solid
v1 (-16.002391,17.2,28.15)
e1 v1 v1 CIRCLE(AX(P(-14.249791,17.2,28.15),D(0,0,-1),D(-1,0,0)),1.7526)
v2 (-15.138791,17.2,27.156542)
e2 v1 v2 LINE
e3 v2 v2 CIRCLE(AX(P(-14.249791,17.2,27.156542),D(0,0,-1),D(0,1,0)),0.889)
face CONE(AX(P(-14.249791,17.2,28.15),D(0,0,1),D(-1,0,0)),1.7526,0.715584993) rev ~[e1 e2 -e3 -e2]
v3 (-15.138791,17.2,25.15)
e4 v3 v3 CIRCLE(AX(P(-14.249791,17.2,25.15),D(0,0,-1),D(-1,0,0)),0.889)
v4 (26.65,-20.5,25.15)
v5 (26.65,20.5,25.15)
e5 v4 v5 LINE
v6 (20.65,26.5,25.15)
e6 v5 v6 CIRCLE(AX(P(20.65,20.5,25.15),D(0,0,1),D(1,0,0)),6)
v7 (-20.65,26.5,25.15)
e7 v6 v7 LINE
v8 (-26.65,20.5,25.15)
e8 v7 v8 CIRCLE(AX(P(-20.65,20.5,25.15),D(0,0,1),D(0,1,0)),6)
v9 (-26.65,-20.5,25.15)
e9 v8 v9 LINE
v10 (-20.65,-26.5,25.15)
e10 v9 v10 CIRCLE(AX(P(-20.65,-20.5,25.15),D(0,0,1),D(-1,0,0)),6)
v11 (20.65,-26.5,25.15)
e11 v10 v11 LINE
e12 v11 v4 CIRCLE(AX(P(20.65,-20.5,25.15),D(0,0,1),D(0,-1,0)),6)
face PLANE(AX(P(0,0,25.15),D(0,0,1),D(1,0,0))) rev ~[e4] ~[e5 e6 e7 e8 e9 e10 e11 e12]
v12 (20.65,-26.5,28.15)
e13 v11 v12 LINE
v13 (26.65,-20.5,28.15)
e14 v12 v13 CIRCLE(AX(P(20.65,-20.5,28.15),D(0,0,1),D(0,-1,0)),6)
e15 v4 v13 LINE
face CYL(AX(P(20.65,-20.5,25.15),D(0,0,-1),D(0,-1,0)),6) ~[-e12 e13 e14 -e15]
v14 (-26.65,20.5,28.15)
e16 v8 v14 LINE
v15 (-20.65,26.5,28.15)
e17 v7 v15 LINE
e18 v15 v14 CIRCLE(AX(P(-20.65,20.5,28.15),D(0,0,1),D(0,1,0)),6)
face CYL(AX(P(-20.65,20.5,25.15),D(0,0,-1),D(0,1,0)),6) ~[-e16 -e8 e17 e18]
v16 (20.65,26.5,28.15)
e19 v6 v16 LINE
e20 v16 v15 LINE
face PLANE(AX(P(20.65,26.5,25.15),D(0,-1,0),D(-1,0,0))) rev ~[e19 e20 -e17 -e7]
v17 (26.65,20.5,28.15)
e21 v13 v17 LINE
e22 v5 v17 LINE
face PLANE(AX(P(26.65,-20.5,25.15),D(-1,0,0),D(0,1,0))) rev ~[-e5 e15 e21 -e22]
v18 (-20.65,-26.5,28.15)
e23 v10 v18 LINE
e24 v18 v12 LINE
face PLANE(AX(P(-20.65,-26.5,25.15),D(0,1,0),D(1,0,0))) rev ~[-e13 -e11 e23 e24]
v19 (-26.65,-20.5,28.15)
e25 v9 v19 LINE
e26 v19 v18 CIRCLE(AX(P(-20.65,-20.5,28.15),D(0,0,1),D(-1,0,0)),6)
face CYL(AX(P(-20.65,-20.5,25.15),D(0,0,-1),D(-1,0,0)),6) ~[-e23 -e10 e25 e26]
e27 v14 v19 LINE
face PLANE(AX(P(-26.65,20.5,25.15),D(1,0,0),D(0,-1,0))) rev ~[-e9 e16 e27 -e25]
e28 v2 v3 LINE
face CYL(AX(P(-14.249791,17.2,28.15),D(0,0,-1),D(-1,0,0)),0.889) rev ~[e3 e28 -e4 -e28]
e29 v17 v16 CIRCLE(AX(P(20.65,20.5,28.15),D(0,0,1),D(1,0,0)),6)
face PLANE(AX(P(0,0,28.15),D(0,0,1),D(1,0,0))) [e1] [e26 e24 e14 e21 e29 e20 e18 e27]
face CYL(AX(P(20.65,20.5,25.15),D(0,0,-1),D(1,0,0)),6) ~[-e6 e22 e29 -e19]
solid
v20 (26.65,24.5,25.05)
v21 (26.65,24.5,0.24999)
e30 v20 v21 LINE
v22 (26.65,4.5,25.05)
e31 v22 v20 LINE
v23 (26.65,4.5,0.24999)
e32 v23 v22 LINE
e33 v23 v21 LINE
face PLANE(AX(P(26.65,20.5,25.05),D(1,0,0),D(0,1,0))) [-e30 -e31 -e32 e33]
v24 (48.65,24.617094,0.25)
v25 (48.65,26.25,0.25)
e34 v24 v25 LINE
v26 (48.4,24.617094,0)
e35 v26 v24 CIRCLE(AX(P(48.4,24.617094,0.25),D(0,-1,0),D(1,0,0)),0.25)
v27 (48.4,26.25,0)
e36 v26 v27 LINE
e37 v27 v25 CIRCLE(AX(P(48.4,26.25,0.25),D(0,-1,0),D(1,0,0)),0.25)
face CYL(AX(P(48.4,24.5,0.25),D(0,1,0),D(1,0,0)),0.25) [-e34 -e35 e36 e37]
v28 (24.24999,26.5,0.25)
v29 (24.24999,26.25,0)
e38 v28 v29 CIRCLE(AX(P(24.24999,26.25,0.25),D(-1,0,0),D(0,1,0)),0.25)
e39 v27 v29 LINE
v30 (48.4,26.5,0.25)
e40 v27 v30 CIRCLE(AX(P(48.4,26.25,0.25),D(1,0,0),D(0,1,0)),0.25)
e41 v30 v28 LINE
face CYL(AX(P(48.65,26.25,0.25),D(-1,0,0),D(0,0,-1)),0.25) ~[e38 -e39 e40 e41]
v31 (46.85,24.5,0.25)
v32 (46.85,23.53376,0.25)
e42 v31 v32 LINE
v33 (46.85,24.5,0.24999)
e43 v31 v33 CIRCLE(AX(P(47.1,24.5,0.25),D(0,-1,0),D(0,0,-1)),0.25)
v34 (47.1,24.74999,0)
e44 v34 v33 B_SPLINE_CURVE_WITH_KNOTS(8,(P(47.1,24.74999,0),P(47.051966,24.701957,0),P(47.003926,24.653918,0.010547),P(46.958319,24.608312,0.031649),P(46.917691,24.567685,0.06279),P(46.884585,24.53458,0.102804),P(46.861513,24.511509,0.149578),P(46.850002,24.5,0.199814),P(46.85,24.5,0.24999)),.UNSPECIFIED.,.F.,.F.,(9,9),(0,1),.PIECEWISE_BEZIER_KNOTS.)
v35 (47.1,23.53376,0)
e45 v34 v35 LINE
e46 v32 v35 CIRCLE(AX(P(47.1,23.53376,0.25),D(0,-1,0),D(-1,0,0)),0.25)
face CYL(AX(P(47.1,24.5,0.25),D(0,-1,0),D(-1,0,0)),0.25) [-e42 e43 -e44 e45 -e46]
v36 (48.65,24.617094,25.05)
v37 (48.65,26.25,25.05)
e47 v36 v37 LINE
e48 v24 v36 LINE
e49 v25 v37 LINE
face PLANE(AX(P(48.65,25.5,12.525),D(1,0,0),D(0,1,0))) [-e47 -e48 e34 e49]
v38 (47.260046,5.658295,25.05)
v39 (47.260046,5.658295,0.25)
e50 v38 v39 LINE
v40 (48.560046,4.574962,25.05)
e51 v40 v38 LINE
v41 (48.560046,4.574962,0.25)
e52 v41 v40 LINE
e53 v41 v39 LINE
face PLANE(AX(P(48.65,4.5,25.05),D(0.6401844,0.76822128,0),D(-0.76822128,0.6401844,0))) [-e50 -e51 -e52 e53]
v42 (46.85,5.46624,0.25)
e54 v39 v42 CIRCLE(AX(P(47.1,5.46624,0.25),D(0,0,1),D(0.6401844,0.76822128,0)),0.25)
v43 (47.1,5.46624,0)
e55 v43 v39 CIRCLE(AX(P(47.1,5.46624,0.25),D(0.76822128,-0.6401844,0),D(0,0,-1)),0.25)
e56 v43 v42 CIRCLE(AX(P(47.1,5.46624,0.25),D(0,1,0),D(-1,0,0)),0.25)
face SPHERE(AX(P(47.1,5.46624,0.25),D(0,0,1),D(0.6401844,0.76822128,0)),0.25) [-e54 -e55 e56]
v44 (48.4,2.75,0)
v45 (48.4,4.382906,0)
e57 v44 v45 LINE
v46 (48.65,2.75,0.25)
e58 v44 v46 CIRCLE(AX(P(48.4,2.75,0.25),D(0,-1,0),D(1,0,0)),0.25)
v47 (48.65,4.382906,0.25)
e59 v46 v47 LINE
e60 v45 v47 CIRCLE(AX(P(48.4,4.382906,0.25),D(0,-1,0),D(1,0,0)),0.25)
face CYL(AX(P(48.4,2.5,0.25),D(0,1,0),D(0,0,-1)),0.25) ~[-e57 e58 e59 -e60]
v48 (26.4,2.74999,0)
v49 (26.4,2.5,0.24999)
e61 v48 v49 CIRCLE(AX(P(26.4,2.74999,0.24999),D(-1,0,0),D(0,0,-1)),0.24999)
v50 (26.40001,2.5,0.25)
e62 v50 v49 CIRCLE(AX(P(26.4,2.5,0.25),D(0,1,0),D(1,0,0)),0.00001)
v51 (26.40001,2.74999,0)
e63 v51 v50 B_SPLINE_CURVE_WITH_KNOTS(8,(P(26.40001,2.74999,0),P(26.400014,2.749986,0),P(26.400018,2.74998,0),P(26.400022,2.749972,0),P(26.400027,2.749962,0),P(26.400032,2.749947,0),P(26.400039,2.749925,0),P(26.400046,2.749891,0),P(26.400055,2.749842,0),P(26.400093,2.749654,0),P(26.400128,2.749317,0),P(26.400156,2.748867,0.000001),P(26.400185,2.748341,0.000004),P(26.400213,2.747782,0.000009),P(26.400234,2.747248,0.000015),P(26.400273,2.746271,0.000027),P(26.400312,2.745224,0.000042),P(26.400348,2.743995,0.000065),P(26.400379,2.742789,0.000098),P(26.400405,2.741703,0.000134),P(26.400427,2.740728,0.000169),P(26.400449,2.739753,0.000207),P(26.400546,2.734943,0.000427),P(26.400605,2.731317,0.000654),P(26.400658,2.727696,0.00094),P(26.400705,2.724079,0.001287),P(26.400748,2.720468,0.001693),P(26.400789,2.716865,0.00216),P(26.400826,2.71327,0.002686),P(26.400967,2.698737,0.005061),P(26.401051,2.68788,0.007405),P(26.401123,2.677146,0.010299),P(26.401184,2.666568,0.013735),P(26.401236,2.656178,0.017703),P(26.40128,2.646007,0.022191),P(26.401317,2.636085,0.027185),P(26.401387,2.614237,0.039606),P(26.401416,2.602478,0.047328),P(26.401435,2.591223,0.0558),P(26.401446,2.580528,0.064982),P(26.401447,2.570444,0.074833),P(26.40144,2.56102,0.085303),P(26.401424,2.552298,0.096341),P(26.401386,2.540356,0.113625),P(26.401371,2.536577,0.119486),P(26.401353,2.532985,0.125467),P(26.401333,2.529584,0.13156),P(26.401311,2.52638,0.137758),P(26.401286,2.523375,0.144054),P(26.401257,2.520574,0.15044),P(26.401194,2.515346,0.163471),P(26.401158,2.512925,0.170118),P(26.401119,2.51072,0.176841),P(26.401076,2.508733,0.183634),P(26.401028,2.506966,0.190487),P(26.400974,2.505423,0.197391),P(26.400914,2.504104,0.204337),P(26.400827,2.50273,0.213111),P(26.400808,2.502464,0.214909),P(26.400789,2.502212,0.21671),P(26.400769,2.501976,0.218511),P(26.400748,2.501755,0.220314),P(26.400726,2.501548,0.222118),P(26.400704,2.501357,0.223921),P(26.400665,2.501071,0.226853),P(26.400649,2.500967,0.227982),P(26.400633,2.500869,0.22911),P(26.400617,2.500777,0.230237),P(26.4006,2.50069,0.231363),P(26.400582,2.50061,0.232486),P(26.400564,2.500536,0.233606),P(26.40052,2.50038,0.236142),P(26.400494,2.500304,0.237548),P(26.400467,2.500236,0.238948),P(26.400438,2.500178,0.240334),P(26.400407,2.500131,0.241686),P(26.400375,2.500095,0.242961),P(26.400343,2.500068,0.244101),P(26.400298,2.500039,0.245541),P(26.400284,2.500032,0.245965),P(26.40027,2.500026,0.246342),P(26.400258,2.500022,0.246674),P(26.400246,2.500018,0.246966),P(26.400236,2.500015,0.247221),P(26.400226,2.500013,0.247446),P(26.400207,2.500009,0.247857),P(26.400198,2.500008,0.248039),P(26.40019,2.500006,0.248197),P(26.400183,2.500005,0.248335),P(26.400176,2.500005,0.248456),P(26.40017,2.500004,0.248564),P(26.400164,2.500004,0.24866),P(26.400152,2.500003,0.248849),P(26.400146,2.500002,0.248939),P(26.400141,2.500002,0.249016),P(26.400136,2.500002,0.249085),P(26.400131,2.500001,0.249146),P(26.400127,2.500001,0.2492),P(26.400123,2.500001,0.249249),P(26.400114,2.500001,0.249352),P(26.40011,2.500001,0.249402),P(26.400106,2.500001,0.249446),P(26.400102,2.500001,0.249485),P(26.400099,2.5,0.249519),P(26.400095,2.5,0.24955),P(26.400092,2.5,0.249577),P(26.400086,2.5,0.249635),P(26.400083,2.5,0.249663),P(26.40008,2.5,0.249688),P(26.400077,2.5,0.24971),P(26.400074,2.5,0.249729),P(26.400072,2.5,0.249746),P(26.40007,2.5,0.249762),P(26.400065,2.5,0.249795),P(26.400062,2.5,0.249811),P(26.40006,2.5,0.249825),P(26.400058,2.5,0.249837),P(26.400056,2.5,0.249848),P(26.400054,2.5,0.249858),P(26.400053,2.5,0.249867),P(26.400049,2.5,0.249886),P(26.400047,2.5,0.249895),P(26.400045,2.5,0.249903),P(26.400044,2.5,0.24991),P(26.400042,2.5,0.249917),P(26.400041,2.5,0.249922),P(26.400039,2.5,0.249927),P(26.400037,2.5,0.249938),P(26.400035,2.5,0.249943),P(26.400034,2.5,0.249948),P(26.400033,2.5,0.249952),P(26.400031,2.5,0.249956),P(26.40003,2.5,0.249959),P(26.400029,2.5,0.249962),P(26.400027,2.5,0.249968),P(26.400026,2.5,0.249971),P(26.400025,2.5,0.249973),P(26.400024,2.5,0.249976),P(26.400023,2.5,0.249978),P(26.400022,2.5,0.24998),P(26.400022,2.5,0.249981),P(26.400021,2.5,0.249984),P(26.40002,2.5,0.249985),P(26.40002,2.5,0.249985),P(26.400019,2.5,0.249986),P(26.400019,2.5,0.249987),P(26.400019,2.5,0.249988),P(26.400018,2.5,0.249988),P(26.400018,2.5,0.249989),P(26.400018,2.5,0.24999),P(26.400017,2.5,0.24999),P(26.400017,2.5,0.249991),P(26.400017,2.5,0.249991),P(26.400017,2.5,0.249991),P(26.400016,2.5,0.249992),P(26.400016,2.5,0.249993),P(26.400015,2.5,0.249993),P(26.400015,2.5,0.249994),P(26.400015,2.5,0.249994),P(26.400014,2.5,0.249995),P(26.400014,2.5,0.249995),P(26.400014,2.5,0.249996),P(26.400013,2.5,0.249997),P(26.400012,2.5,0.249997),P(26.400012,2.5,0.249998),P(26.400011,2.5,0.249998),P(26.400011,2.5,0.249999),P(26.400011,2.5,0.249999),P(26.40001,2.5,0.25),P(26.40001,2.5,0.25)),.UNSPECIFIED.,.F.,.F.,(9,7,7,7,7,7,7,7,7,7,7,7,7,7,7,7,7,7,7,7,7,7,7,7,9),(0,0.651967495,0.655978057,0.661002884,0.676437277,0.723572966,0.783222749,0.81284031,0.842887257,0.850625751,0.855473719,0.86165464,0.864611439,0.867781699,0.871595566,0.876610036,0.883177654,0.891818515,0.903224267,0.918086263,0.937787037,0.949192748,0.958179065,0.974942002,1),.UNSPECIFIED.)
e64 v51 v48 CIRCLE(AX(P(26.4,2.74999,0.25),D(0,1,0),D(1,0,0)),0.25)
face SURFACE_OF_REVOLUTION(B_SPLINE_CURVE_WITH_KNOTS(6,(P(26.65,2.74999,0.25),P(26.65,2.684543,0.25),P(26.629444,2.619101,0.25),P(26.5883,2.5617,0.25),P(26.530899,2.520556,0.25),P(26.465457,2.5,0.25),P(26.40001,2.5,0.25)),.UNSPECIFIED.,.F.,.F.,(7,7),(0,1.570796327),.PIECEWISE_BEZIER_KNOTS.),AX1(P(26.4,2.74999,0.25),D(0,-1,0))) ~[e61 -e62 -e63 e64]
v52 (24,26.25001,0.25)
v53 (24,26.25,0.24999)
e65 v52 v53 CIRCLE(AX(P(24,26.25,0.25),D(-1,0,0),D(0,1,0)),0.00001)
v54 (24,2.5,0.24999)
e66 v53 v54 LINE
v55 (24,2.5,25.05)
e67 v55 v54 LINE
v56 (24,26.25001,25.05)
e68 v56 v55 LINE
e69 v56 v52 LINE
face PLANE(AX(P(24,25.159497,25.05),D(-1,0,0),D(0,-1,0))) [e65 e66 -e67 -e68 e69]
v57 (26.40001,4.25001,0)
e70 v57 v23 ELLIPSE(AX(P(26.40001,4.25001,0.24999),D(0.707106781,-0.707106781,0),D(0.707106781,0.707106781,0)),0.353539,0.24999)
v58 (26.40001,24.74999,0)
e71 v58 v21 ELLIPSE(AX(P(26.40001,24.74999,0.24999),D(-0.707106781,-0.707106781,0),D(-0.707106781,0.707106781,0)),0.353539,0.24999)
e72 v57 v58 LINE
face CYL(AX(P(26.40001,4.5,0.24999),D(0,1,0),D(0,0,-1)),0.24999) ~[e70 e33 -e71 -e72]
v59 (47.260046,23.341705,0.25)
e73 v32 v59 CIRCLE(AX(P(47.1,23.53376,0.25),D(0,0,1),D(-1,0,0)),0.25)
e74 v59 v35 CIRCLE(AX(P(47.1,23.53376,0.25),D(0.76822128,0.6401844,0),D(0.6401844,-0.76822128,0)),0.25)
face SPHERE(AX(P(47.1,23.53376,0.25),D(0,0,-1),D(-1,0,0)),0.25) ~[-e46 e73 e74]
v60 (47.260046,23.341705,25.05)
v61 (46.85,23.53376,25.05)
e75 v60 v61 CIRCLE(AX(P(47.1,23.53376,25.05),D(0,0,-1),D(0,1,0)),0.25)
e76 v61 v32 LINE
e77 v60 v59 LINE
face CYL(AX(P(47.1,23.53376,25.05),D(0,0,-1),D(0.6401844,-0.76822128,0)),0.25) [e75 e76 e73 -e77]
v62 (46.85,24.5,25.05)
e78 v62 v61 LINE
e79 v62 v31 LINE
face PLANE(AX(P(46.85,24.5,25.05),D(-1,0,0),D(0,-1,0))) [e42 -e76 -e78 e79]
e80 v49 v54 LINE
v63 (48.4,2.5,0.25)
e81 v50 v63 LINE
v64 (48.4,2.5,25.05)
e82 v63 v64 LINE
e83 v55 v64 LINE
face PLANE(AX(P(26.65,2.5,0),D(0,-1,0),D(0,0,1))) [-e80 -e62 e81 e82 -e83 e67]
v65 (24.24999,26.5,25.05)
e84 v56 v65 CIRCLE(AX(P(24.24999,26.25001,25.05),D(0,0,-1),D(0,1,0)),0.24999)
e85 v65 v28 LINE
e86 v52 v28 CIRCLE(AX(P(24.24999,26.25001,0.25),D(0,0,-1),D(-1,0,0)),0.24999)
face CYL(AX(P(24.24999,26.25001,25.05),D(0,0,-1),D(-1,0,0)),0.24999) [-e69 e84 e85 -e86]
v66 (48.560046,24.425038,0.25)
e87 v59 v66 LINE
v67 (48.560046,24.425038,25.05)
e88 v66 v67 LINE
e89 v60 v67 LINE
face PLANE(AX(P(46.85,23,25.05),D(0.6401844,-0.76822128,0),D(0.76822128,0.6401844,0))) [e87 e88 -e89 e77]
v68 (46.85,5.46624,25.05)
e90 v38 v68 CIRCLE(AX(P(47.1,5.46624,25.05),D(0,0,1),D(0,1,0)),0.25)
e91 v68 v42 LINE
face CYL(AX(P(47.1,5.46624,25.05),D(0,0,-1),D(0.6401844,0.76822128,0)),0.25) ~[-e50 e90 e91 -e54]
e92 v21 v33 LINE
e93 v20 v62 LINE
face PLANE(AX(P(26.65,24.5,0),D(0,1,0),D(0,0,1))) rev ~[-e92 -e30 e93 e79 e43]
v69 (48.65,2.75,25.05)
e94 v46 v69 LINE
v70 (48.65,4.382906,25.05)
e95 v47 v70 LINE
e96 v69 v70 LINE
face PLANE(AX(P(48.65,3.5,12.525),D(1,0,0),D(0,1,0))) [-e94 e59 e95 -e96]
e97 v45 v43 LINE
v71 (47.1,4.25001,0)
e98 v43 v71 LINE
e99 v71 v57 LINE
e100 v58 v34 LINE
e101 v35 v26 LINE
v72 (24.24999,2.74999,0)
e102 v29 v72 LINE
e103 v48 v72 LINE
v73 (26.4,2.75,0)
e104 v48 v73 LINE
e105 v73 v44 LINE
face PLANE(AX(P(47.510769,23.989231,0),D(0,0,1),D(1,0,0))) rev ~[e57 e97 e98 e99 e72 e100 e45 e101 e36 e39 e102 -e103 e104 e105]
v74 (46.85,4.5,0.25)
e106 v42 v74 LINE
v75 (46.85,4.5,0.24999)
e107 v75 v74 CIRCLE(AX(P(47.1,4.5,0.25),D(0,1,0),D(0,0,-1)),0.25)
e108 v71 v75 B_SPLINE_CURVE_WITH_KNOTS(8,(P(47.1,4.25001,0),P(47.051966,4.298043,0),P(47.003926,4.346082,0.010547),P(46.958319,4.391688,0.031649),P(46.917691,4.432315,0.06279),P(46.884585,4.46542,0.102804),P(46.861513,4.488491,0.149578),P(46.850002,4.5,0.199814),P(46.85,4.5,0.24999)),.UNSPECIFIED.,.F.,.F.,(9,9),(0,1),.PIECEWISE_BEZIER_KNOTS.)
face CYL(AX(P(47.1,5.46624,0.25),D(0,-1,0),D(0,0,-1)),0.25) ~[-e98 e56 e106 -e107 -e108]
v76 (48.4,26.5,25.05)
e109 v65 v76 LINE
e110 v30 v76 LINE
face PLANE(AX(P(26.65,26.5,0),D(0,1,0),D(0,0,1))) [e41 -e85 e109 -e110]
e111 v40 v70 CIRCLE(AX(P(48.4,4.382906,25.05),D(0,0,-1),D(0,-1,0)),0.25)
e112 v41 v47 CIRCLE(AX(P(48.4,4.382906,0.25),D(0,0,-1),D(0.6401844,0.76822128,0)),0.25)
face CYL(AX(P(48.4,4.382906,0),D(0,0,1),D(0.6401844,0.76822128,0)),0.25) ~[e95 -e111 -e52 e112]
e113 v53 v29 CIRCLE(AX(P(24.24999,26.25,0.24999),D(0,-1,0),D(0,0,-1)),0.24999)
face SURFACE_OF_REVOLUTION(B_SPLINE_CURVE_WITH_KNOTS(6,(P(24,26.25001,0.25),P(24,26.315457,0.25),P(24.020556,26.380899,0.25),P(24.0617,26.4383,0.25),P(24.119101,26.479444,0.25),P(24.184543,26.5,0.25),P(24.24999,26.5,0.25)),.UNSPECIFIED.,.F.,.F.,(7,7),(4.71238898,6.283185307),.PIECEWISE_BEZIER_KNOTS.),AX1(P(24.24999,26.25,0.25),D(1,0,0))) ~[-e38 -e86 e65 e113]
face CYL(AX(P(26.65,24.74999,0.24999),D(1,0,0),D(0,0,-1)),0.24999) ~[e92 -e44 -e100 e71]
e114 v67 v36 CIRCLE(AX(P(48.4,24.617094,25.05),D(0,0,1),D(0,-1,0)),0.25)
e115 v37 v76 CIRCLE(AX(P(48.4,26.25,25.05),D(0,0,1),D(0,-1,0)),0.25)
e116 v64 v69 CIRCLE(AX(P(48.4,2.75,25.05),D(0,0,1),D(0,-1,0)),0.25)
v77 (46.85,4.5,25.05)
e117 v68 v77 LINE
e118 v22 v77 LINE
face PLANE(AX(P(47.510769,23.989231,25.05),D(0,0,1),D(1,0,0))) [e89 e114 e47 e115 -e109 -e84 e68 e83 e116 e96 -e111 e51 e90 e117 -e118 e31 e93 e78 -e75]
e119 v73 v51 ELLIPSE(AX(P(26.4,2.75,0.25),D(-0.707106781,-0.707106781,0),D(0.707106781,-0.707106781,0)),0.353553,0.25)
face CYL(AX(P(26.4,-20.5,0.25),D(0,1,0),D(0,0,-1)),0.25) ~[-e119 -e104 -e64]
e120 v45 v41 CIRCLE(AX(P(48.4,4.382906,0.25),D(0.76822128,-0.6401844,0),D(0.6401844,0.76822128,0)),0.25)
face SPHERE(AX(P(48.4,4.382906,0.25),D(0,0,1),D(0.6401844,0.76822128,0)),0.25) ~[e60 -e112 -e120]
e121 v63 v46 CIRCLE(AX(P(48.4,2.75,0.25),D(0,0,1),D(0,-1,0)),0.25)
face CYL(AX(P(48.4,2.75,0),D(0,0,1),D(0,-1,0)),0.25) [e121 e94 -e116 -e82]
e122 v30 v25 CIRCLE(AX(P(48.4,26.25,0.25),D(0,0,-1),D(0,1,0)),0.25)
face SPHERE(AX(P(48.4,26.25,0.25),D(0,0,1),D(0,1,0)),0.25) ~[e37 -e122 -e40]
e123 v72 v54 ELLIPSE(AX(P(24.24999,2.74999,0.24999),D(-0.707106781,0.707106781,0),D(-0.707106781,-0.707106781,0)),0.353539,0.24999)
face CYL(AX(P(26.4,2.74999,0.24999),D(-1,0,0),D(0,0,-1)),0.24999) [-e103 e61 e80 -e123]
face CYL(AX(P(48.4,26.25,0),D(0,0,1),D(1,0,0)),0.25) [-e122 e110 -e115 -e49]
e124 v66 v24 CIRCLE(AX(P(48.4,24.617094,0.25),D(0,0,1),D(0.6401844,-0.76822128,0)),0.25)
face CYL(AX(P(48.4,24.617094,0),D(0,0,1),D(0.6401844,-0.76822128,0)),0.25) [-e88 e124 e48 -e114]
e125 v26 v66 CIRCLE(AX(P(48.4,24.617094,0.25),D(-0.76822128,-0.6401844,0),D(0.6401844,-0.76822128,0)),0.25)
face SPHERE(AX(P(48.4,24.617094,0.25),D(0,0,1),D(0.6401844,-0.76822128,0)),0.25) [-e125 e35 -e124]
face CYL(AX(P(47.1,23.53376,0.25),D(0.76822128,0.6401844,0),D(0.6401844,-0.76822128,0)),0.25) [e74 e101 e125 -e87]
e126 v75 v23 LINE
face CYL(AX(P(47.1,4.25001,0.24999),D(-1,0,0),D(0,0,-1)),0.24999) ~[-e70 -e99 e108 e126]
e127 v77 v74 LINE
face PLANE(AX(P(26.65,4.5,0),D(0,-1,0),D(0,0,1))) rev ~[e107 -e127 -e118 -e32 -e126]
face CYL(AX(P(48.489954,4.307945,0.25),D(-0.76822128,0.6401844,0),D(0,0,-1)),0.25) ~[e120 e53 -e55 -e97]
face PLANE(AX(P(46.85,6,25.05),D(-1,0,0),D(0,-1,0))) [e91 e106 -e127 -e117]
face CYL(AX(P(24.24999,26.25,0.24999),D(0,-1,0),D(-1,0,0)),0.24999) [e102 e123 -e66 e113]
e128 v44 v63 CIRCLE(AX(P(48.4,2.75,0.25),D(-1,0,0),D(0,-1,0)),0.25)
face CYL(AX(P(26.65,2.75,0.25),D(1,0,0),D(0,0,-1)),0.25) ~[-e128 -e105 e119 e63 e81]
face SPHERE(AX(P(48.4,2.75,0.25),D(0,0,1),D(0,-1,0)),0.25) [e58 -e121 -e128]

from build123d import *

# Parameters (mm, degrees)
F1_DEPTH          = 2.55
F3_DEPTH          = 22.5
F4_W              = 5
F4_H              = 12.2
F5_DEPTH          = 25
F6_W              = 1.5
F6_H              = 12.3
F7_DEPTH          = 22.5
F8_SIZE2          = 5
F8_SIZE           = 10
F9_W              = 10
F9_H              = 7
F10_DEPTH         = 25
F11_W             = 5
F11_H             = 12.2
F12_DEPTH         = 1.5
F13_R             = 4.5
F14_DEPTH         = 22.5
F17_DEPTH         = 3
F19_D             = 1.778
F19_DEPTH         = 12
F19_CSINK_D       = 3.5052
F19_CSINK_ANGLE   = 82
F19_TIP           = 0.5341650903
F19_2_D           = 1.778
F19_2_DEPTH       = 12
F19_2_CSINK_D     = 3.5052
F19_2_CSINK_ANGLE = 82
F19_2_TIP         = 0.5341650903
F20_W             = 2
F20_H             = 25.05
F21_DEPTH         = 22
F22_W             = 2
F22_H             = 25.05
F23_DEPTH         = 6
F25_DEPTH         = 25.05
F26_R             = 0.25
F27_R             = 0.25
F28_R             = 0.25
F29_R             = 0.25
F30_W             = 6
F30_H             = 0.5
F30_H_2           = 1
F31_DEPTH         = 40
F33_DEPTH         = 25.051
F35_DEPTH         = 25.05
F36_R             = 0.24999


# Not quite as in the source:
# - a fillet or chamfer is up to 0.001 mm smaller than in the source, because OpenCascade refuses the exact size


with BuildPart() as f1:
    # F0 (on Top) → F1 (new body)
    with BuildSketch(Plane.XY):
        with BuildLine():
            ThreePointArc((26.65, 20.5), (24.8926406871, 24.7426406871), (20.65, 26.5))
            Line((20.65, 26.5), (-20.65, 26.5))
            ThreePointArc((-20.65, 26.5), (-24.8926406871, 24.7426406871), (-26.65, 20.5))
            Line((-26.65, 20.5), (-26.65, -20.5))
            ThreePointArc((-26.65, -20.5), (-24.8926406871, -24.7426406871), (-20.65, -26.5))
            Line((-20.65, -26.5), (20.65, -26.5))
            ThreePointArc((20.65, -26.5), (24.8926406871, -24.7426406871), (26.65, -20.5))
            Line((26.65, -20.5), (26.65, 20.5))
        make_face()
    extrude(amount=F1_DEPTH)

    # F2 (on face) → F3 (join)
    with BuildSketch(Plane.XY.offset(2.55)):
        with BuildLine():
            Line((26.65, -20.5), (26.65, 20.5))
            ThreePointArc((26.65, 20.5), (24.8926406871, 24.7426406871), (20.65, 26.5))
            Line((20.65, 26.5), (-20.65, 26.5))
            ThreePointArc((-20.65, 26.5), (-24.8926406871, 24.7426406871), (-26.65, 20.5))
            Line((-26.65, 20.5), (-26.65, -20.5))
            ThreePointArc((-26.65, -20.5), (-24.8926406871, -24.7426406871), (-20.65, -26.5))
            Line((-20.65, -26.5), (20.65, -26.5))
            ThreePointArc((20.65, -26.5), (24.8926406871, -24.7426406871), (26.65, -20.5))
        make_face()
        with BuildLine():
            Line((-20, 24), (20, 24))
            ThreePointArc((20, 24), (22.8284271247, 22.8284271247), (24, 20))
            Line((24, 20), (24, -20))
            ThreePointArc((24, -20), (22.8284271247, -22.8284271247), (20, -24))
            Line((20, -24), (-20, -24))
            ThreePointArc((-20, -24), (-22.8284271247, -22.8284271247), (-24, -20))
            Line((-24, -20), (-24, 20))
            ThreePointArc((-24, 20), (-22.8284271247, 22.8284271247), (-20, 24))
        make_face(mode=Mode.SUBTRACT)
    extrude(amount=F3_DEPTH)

    # F4 (on face) → F5 (cut)
    with BuildSketch(Plane.XZ.offset(26.5)):
        with Locations((-13, 14.45)):
            Rectangle(F4_W, F4_H)
        with Locations((0.5, 14.45)):
            Rectangle(F4_W, F4_H)
    extrude(amount=-F5_DEPTH, mode=Mode.SUBTRACT)

    # F6 (on face) → F7 (join, through all)
    with BuildSketch(Plane.XY.offset(2.55)):
        with Locations((2.25, 17.85)):
            Rectangle(F6_W, F6_H)
    extrude(amount=F7_DEPTH)

    # F8
    f8_edges = [f1.edges().sort_by_distance(p)[0] for p in [
        (2.25, 11.7, 25.05),
    ]]
    f8_side = f1.faces().sort_by_distance((2.25, 11.7, 13.8))[0]
    chamfer(f8_edges, length=F8_SIZE, length2=F8_SIZE2, reference=f8_side)

    # F9 (on face) → F10 (cut)
    with BuildSketch(Plane.XZ.offset(-24)):
        with Locations((9, 6.05)):
            Rectangle(F9_W, F9_H)
    extrude(amount=-F10_DEPTH, mode=Mode.SUBTRACT)

    # F11 (on face) → F12 (cut)
    with BuildSketch(Plane(origin=(0, -24, 0), x_dir=(-1, 0, 0), z_dir=(0, 1, 0))):
        with Locations((-0.5, 14.45)):
            Rectangle(F11_W, F11_H)
        with Locations((13, 14.45)):
            Rectangle(F11_W, F11_H)
    extrude(amount=-F12_DEPTH, mode=Mode.SUBTRACT)

    # F13 (on face) → F14 (join, through all)
    with BuildSketch(Plane.XY.offset(2.55)):
        with Locations((-14.2497913912, 17.2)):
            Circle(F13_R)
    extrude(amount=F14_DEPTH)

    # F19
    with Locations(Plane.XY.offset(28.15)):
        with Locations((-14.2497913912, 17.2)):
            CounterSinkHole(F19_D / 2, F19_CSINK_D / 2, depth=F19_DEPTH, counter_sink_angle=F19_CSINK_ANGLE)
            with Locations((0, 0, -(F19_DEPTH + F19_TIP / 2))):  # 118° drill point
                Cone(0, F19_D / 2, F19_TIP, mode=Mode.SUBTRACT)

    # F20 (on face) → F21 (join)
    with BuildSketch(Plane.YZ.offset(26.65)):
        with Locations((3.5, 12.525)):
            Rectangle(F20_W, F20_H)
    extrude(amount=F21_DEPTH)



with BuildPart() as f17:
    # F16 (on offset) → F17 (new body)
    with BuildSketch(Plane.XY.offset(25.15)):
        with BuildLine():
            ThreePointArc((26.65, 20.5), (24.8926406871, 24.7426406871), (20.65, 26.5))
            Line((20.65, 26.5), (-20.65, 26.5))
            ThreePointArc((-20.65, 26.5), (-24.8926406871, 24.7426406871), (-26.65, 20.5))
            Line((-26.65, 20.5), (-26.65, -20.5))
            ThreePointArc((-26.65, -20.5), (-24.8926406871, -24.7426406871), (-20.65, -26.5))
            Line((-20.65, -26.5), (20.65, -26.5))
            ThreePointArc((20.65, -26.5), (24.8926406871, -24.7426406871), (26.65, -20.5))
            Line((26.65, -20.5), (26.65, 20.5))
        make_face()
    extrude(amount=F17_DEPTH)

    # F19#2
    with Locations(Plane.XY.offset(28.15)):
        with Locations((-14.2497913912, 17.2)):
            CounterSinkHole(F19_2_D / 2, F19_2_CSINK_D / 2, depth=F19_2_DEPTH, counter_sink_angle=F19_2_CSINK_ANGLE)
            with Locations((0, 0, -(F19_2_DEPTH + F19_2_TIP / 2))):  # 118° drill point
                Cone(0, F19_2_D / 2, F19_2_TIP, mode=Mode.SUBTRACT)


with BuildPart() as f21:
    # F20 (on face) → F21, piece 2 (new body)
    with BuildSketch(Plane.YZ.offset(26.65)):
        with Locations((25.5, 12.525)):
            Rectangle(F20_W, F20_H)
    extrude(amount=F21_DEPTH)


with BuildPart() as f1_1:
    add(f1.part)

    add(f21.part)  # F23 merges F21
    # F22 (on face) → F23 (join, through all)
    with BuildSketch(Plane(origin=(26.65, 0, 0), x_dir=(0, -1, 0), z_dir=(-1, 0, 0))):
        with Locations((-25.5, 12.525)):
            Rectangle(F22_W, F22_H)
    extrude(amount=F23_DEPTH)

    # F24 (on face) → F25 (join, through all)
    with BuildSketch(Plane.XY.offset(25.05)):
        Polygon((46.85, 23), (48.65, 24.5), (46.85, 24.5), align=None)
        Polygon((46.85, 6), (46.85, 4.5), (48.65, 4.5), align=None)
    extrude(amount=-F25_DEPTH)

    # F26
    f26_edges = [f1_1.edges().sort_by_distance(p)[0] for p in [
        (46.85, 23, 12.525),
        (46.85, 6, 12.525),
    ]]
    fillet(f26_edges, radius=F26_R)

    # F27
    f27_edges = [f1_1.edges().sort_by_distance(p)[0] for p in [
        (48.65, 26.5, 12.525),
        (48.65, 2.5, 12.525),
        (37.65, 2.5, 0),
        (14, 26.5, 0),
        (48.65, 25.5, 0),
        (48.65, 3.5, 0),
        (48.65, 4.5, 12.525),
        (48.65, 24.5, 12.525),
        (47.955023, 23.920853, 0),
        (47.955023, 5.079147, 0),
    ]]
    fillet(f27_edges, radius=F27_R)

    # F28
    f28_edges = [f1_1.edges().sort_by_distance(p)[0] for p in [
        (14, 24, 6.05),
        (14, 26.5, 6.05),
        (9, 26.5, 2.55),
        (4, 26.5, 6.05),
        (4, 24, 6.05),
    ]]
    fillet(f28_edges, radius=F28_R)

    # F29
    f29_edges = [f1_1.edges().sort_by_distance(p)[0] for p in [
        (-2, -26.5, 14.45),
        (-2, -24, 14.45),
        (-10.5, -26.5, 14.45),
        (-15.5, -26.5, 14.45),
        (-15.5, -24, 14.45),
        (-13, -26.5, 8.35),
        (-13, -24, 8.35),
        (0.5, -26.5, 8.35),
        (0.5, -24, 8.35),
        (3, -24, 14.45),
        (3, -26.5, 14.45),
        (-10.5, -24, 14.45),
    ]]
    fillet(f29_edges, radius=F29_R)

    # F30 (on face) → F31 (cut)
    with BuildSketch(Plane.XY.offset(2.55)):
        with BuildLine():
            Line((24, 13.4), (-24, 13.4))
            Line((-24, 13.4), (-24, -20.5))
            ThreePointArc((-24, -20.5), (-22.8284271247, -23.3284271247), (-20, -24.5))
            Line((-20, -24.5), (-16, -24.5))
            Line((-16, -24.5), (-16, -24))
            Line((-16, -24), (-10, -24))
            Line((-10, -24), (-10, -24.5))
            Line((-10, -24.5), (-2.5, -24.5))
            Line((-2.5, -24.5), (-2.5, -24))
            Line((-2.5, -24), (3.5, -24))
            Line((3.5, -24), (3.5, -24.5))
            Line((3.5, -24.5), (20, -24.5))
            ThreePointArc((20, -24.5), (22.8284271247, -23.3284271247), (24, -20.5))
            Line((24, -20.5), (24, 13.4))
        make_face()
        with Locations((-13, -24.25)):
            Rectangle(F30_W, F30_H)
        with Locations((-13, -25)):
            Rectangle(F30_W, F30_H_2)
        with Locations((0.5, -25)):
            Rectangle(F30_W, F30_H_2)
        with Locations((0.5, -24.25)):
            Rectangle(F30_W, F30_H)
    extrude(amount=F31_DEPTH, mode=Mode.SUBTRACT)

    # F32 (on face) → F33 (cut, through all)
    with BuildSketch(Plane.XY.offset(25.05)):
        with BuildLine():
            Line((-26.65, 2.5), (-24, 2.5))
            Line((-24, 2.5), (-24, 20))
            ThreePointArc((-24, 20), (-22.8284271247, 22.8284271247), (-20, 24))
            Line((-20, 24), (1.5, 24))
            Line((1.5, 24), (1.5, 16.7))
            Line((1.5, 16.7), (3, 16.7))
            Line((3, 16.7), (3, 24))
            Line((3, 24), (20, 24))
            ThreePointArc((20, 24), (22.8284271247, 22.8284271247), (24, 20))
            Line((24, 20), (24, 26.5))
            Line((24, 26.5), (-20.65, 26.5))
            ThreePointArc((-20.65, 26.5), (-24.8926406871, 24.7426406871), (-26.65, 20.5))
            Line((-26.65, 20.5), (-26.65, 2.5))
        make_face()
        with BuildLine():
            Line((26.65, -30.1466379315), (26.65, -20.5))
            ThreePointArc((26.65, -20.5), (24.8926406871, -24.7426406871), (20.65, -26.5))
            Line((20.65, -26.5), (-20.65, -26.5))
            ThreePointArc((-20.65, -26.5), (-24.8926406871, -24.7426406871), (-26.65, -20.5))
            Line((-26.65, -20.5), (-26.65, 2.5))
            Line((-26.65, 2.5), (-34.1783799231, 2.5))
            Line((-34.1783799231, 2.5), (-34.1783799231, -30.1466379315))
            Line((-34.1783799231, -30.1466379315), (26.65, -30.1466379315))
        make_face()
        with BuildLine():
            Line((-34.1783799231, 2.5), (-26.65, 2.5))
            Line((-26.65, 2.5), (-26.65, 20.5))
            ThreePointArc((-26.65, 20.5), (-24.8926406871, 24.7426406871), (-20.65, 26.5))
            Line((-20.65, 26.5), (24, 26.5))
            Line((24, 26.5), (24, 32.8557267785))
            Line((24, 32.8557267785), (-34.1783799231, 32.8557267785))
            Line((-34.1783799231, 32.8557267785), (-34.1783799231, 2.5))
        make_face()
        with BuildLine():
            Line((-24, 2.5), (24, 2.5))
            Line((24, 2.5), (24, 20))
            ThreePointArc((24, 20), (22.8284271247, 22.8284271247), (20, 24))
            Line((20, 24), (3, 24))
            Line((3, 24), (3, 16.7))
            Line((3, 16.7), (1.5, 16.7))
            Line((1.5, 16.7), (1.5, 24))
            Line((1.5, 24), (-20, 24))
            ThreePointArc((-20, 24), (-22.8284271247, 22.8284271247), (-24, 20))
            Line((-24, 20), (-24, 2.5))
        make_face()
        with BuildLine():
            Line((26.65, -20.5), (26.65, 2.5))
            Line((26.65, 2.5), (24, 2.5))
            Line((24, 2.5), (24, -20.5))
            ThreePointArc((24, -20.5), (22.8284271247, -23.3284271247), (20, -24.5))
            Line((20, -24.5), (3.5, -24.5))
            Line((3.5, -24.5), (3.5, -25.5))
            Line((3.5, -25.5), (-2.5, -25.5))
            Line((-2.5, -25.5), (-2.5, -24.5))
            Line((-2.5, -24.5), (-10, -24.5))
            Line((-10, -24.5), (-10, -25.5))
            Line((-10, -25.5), (-16, -25.5))
            Line((-16, -25.5), (-16, -24.5))
            Line((-16, -24.5), (-20, -24.5))
            ThreePointArc((-20, -24.5), (-22.8284271247, -23.3284271247), (-24, -20.5))
            Line((-24, -20.5), (-24, 2.5))
            Line((-24, 2.5), (-26.65, 2.5))
            Line((-26.65, 2.5), (-26.65, -20.5))
            ThreePointArc((-26.65, -20.5), (-24.8926406871, -24.7426406871), (-20.65, -26.5))
            Line((-20.65, -26.5), (20.65, -26.5))
            ThreePointArc((20.65, -26.5), (24.8926406871, -24.7426406871), (26.65, -20.5))
        make_face()
        with BuildLine():
            Line((24, -20.5), (24, 2.5))
            Line((24, 2.5), (-24, 2.5))
            Line((-24, 2.5), (-24, -20.5))
            ThreePointArc((-24, -20.5), (-22.8284271247, -23.3284271247), (-20, -24.5))
            Line((-20, -24.5), (-16, -24.5))
            Line((-16, -24.5), (-16, -25.5))
            Line((-16, -25.5), (-10, -25.5))
            Line((-10, -25.5), (-10, -24.5))
            Line((-10, -24.5), (-2.5, -24.5))
            Line((-2.5, -24.5), (-2.5, -25.5))
            Line((-2.5, -25.5), (3.5, -25.5))
            Line((3.5, -25.5), (3.5, -24.5))
            Line((3.5, -24.5), (20, -24.5))
            ThreePointArc((20, -24.5), (22.8284271247, -23.3284271247), (24, -20.5))
        make_face()
    extrude(amount=-F33_DEPTH, mode=Mode.SUBTRACT)

    # F34 (on face) → F35 (join, through all)
    with BuildSketch(Plane.XY.offset(25.05)):
        with BuildLine():
            Line((24, 20.5), (26.65, 20.5))
            ThreePointArc((26.65, 20.5), (26.2550341538, 22.6409325386), (25.122135955, 24.5))
            Line((25.122135955, 24.5), (26.65, 24.5))
            Line((26.65, 24.5), (26.65, 25.159496814))
            Line((26.65, 25.159496814), (24, 25.159496814))
            Line((24, 25.159496814), (24, 20.5))
        make_face()
        with BuildLine():
            ThreePointArc((25.122135955, 24.5), (26.2550341538, 22.6409325386), (26.65, 20.5))
            Line((26.65, 20.5), (26.65, 24.5))
            Line((26.65, 24.5), (25.122135955, 24.5))
        make_face()
    extrude(amount=-F35_DEPTH)

    # F36 (radius 0.25 in the source; OpenCascade refuses exactly that, so slightly less here)
    f36_edges = [f1_1.edges().sort_by_distance(p)[0] for p in [
        (26.65, 14.5, 0),
        (36.875, 24.5, 0),
        (36.875, 4.5, 0),
        (25.2, 2.5, 0),
        (24, 14.375, 0),
        (24, 26.426777, 0.073223),
        (24, 26.5, 12.65),
    ]]
    fillet(f36_edges, radius=F36_R)


solid = Compound([f17.part, f1_1.part])
